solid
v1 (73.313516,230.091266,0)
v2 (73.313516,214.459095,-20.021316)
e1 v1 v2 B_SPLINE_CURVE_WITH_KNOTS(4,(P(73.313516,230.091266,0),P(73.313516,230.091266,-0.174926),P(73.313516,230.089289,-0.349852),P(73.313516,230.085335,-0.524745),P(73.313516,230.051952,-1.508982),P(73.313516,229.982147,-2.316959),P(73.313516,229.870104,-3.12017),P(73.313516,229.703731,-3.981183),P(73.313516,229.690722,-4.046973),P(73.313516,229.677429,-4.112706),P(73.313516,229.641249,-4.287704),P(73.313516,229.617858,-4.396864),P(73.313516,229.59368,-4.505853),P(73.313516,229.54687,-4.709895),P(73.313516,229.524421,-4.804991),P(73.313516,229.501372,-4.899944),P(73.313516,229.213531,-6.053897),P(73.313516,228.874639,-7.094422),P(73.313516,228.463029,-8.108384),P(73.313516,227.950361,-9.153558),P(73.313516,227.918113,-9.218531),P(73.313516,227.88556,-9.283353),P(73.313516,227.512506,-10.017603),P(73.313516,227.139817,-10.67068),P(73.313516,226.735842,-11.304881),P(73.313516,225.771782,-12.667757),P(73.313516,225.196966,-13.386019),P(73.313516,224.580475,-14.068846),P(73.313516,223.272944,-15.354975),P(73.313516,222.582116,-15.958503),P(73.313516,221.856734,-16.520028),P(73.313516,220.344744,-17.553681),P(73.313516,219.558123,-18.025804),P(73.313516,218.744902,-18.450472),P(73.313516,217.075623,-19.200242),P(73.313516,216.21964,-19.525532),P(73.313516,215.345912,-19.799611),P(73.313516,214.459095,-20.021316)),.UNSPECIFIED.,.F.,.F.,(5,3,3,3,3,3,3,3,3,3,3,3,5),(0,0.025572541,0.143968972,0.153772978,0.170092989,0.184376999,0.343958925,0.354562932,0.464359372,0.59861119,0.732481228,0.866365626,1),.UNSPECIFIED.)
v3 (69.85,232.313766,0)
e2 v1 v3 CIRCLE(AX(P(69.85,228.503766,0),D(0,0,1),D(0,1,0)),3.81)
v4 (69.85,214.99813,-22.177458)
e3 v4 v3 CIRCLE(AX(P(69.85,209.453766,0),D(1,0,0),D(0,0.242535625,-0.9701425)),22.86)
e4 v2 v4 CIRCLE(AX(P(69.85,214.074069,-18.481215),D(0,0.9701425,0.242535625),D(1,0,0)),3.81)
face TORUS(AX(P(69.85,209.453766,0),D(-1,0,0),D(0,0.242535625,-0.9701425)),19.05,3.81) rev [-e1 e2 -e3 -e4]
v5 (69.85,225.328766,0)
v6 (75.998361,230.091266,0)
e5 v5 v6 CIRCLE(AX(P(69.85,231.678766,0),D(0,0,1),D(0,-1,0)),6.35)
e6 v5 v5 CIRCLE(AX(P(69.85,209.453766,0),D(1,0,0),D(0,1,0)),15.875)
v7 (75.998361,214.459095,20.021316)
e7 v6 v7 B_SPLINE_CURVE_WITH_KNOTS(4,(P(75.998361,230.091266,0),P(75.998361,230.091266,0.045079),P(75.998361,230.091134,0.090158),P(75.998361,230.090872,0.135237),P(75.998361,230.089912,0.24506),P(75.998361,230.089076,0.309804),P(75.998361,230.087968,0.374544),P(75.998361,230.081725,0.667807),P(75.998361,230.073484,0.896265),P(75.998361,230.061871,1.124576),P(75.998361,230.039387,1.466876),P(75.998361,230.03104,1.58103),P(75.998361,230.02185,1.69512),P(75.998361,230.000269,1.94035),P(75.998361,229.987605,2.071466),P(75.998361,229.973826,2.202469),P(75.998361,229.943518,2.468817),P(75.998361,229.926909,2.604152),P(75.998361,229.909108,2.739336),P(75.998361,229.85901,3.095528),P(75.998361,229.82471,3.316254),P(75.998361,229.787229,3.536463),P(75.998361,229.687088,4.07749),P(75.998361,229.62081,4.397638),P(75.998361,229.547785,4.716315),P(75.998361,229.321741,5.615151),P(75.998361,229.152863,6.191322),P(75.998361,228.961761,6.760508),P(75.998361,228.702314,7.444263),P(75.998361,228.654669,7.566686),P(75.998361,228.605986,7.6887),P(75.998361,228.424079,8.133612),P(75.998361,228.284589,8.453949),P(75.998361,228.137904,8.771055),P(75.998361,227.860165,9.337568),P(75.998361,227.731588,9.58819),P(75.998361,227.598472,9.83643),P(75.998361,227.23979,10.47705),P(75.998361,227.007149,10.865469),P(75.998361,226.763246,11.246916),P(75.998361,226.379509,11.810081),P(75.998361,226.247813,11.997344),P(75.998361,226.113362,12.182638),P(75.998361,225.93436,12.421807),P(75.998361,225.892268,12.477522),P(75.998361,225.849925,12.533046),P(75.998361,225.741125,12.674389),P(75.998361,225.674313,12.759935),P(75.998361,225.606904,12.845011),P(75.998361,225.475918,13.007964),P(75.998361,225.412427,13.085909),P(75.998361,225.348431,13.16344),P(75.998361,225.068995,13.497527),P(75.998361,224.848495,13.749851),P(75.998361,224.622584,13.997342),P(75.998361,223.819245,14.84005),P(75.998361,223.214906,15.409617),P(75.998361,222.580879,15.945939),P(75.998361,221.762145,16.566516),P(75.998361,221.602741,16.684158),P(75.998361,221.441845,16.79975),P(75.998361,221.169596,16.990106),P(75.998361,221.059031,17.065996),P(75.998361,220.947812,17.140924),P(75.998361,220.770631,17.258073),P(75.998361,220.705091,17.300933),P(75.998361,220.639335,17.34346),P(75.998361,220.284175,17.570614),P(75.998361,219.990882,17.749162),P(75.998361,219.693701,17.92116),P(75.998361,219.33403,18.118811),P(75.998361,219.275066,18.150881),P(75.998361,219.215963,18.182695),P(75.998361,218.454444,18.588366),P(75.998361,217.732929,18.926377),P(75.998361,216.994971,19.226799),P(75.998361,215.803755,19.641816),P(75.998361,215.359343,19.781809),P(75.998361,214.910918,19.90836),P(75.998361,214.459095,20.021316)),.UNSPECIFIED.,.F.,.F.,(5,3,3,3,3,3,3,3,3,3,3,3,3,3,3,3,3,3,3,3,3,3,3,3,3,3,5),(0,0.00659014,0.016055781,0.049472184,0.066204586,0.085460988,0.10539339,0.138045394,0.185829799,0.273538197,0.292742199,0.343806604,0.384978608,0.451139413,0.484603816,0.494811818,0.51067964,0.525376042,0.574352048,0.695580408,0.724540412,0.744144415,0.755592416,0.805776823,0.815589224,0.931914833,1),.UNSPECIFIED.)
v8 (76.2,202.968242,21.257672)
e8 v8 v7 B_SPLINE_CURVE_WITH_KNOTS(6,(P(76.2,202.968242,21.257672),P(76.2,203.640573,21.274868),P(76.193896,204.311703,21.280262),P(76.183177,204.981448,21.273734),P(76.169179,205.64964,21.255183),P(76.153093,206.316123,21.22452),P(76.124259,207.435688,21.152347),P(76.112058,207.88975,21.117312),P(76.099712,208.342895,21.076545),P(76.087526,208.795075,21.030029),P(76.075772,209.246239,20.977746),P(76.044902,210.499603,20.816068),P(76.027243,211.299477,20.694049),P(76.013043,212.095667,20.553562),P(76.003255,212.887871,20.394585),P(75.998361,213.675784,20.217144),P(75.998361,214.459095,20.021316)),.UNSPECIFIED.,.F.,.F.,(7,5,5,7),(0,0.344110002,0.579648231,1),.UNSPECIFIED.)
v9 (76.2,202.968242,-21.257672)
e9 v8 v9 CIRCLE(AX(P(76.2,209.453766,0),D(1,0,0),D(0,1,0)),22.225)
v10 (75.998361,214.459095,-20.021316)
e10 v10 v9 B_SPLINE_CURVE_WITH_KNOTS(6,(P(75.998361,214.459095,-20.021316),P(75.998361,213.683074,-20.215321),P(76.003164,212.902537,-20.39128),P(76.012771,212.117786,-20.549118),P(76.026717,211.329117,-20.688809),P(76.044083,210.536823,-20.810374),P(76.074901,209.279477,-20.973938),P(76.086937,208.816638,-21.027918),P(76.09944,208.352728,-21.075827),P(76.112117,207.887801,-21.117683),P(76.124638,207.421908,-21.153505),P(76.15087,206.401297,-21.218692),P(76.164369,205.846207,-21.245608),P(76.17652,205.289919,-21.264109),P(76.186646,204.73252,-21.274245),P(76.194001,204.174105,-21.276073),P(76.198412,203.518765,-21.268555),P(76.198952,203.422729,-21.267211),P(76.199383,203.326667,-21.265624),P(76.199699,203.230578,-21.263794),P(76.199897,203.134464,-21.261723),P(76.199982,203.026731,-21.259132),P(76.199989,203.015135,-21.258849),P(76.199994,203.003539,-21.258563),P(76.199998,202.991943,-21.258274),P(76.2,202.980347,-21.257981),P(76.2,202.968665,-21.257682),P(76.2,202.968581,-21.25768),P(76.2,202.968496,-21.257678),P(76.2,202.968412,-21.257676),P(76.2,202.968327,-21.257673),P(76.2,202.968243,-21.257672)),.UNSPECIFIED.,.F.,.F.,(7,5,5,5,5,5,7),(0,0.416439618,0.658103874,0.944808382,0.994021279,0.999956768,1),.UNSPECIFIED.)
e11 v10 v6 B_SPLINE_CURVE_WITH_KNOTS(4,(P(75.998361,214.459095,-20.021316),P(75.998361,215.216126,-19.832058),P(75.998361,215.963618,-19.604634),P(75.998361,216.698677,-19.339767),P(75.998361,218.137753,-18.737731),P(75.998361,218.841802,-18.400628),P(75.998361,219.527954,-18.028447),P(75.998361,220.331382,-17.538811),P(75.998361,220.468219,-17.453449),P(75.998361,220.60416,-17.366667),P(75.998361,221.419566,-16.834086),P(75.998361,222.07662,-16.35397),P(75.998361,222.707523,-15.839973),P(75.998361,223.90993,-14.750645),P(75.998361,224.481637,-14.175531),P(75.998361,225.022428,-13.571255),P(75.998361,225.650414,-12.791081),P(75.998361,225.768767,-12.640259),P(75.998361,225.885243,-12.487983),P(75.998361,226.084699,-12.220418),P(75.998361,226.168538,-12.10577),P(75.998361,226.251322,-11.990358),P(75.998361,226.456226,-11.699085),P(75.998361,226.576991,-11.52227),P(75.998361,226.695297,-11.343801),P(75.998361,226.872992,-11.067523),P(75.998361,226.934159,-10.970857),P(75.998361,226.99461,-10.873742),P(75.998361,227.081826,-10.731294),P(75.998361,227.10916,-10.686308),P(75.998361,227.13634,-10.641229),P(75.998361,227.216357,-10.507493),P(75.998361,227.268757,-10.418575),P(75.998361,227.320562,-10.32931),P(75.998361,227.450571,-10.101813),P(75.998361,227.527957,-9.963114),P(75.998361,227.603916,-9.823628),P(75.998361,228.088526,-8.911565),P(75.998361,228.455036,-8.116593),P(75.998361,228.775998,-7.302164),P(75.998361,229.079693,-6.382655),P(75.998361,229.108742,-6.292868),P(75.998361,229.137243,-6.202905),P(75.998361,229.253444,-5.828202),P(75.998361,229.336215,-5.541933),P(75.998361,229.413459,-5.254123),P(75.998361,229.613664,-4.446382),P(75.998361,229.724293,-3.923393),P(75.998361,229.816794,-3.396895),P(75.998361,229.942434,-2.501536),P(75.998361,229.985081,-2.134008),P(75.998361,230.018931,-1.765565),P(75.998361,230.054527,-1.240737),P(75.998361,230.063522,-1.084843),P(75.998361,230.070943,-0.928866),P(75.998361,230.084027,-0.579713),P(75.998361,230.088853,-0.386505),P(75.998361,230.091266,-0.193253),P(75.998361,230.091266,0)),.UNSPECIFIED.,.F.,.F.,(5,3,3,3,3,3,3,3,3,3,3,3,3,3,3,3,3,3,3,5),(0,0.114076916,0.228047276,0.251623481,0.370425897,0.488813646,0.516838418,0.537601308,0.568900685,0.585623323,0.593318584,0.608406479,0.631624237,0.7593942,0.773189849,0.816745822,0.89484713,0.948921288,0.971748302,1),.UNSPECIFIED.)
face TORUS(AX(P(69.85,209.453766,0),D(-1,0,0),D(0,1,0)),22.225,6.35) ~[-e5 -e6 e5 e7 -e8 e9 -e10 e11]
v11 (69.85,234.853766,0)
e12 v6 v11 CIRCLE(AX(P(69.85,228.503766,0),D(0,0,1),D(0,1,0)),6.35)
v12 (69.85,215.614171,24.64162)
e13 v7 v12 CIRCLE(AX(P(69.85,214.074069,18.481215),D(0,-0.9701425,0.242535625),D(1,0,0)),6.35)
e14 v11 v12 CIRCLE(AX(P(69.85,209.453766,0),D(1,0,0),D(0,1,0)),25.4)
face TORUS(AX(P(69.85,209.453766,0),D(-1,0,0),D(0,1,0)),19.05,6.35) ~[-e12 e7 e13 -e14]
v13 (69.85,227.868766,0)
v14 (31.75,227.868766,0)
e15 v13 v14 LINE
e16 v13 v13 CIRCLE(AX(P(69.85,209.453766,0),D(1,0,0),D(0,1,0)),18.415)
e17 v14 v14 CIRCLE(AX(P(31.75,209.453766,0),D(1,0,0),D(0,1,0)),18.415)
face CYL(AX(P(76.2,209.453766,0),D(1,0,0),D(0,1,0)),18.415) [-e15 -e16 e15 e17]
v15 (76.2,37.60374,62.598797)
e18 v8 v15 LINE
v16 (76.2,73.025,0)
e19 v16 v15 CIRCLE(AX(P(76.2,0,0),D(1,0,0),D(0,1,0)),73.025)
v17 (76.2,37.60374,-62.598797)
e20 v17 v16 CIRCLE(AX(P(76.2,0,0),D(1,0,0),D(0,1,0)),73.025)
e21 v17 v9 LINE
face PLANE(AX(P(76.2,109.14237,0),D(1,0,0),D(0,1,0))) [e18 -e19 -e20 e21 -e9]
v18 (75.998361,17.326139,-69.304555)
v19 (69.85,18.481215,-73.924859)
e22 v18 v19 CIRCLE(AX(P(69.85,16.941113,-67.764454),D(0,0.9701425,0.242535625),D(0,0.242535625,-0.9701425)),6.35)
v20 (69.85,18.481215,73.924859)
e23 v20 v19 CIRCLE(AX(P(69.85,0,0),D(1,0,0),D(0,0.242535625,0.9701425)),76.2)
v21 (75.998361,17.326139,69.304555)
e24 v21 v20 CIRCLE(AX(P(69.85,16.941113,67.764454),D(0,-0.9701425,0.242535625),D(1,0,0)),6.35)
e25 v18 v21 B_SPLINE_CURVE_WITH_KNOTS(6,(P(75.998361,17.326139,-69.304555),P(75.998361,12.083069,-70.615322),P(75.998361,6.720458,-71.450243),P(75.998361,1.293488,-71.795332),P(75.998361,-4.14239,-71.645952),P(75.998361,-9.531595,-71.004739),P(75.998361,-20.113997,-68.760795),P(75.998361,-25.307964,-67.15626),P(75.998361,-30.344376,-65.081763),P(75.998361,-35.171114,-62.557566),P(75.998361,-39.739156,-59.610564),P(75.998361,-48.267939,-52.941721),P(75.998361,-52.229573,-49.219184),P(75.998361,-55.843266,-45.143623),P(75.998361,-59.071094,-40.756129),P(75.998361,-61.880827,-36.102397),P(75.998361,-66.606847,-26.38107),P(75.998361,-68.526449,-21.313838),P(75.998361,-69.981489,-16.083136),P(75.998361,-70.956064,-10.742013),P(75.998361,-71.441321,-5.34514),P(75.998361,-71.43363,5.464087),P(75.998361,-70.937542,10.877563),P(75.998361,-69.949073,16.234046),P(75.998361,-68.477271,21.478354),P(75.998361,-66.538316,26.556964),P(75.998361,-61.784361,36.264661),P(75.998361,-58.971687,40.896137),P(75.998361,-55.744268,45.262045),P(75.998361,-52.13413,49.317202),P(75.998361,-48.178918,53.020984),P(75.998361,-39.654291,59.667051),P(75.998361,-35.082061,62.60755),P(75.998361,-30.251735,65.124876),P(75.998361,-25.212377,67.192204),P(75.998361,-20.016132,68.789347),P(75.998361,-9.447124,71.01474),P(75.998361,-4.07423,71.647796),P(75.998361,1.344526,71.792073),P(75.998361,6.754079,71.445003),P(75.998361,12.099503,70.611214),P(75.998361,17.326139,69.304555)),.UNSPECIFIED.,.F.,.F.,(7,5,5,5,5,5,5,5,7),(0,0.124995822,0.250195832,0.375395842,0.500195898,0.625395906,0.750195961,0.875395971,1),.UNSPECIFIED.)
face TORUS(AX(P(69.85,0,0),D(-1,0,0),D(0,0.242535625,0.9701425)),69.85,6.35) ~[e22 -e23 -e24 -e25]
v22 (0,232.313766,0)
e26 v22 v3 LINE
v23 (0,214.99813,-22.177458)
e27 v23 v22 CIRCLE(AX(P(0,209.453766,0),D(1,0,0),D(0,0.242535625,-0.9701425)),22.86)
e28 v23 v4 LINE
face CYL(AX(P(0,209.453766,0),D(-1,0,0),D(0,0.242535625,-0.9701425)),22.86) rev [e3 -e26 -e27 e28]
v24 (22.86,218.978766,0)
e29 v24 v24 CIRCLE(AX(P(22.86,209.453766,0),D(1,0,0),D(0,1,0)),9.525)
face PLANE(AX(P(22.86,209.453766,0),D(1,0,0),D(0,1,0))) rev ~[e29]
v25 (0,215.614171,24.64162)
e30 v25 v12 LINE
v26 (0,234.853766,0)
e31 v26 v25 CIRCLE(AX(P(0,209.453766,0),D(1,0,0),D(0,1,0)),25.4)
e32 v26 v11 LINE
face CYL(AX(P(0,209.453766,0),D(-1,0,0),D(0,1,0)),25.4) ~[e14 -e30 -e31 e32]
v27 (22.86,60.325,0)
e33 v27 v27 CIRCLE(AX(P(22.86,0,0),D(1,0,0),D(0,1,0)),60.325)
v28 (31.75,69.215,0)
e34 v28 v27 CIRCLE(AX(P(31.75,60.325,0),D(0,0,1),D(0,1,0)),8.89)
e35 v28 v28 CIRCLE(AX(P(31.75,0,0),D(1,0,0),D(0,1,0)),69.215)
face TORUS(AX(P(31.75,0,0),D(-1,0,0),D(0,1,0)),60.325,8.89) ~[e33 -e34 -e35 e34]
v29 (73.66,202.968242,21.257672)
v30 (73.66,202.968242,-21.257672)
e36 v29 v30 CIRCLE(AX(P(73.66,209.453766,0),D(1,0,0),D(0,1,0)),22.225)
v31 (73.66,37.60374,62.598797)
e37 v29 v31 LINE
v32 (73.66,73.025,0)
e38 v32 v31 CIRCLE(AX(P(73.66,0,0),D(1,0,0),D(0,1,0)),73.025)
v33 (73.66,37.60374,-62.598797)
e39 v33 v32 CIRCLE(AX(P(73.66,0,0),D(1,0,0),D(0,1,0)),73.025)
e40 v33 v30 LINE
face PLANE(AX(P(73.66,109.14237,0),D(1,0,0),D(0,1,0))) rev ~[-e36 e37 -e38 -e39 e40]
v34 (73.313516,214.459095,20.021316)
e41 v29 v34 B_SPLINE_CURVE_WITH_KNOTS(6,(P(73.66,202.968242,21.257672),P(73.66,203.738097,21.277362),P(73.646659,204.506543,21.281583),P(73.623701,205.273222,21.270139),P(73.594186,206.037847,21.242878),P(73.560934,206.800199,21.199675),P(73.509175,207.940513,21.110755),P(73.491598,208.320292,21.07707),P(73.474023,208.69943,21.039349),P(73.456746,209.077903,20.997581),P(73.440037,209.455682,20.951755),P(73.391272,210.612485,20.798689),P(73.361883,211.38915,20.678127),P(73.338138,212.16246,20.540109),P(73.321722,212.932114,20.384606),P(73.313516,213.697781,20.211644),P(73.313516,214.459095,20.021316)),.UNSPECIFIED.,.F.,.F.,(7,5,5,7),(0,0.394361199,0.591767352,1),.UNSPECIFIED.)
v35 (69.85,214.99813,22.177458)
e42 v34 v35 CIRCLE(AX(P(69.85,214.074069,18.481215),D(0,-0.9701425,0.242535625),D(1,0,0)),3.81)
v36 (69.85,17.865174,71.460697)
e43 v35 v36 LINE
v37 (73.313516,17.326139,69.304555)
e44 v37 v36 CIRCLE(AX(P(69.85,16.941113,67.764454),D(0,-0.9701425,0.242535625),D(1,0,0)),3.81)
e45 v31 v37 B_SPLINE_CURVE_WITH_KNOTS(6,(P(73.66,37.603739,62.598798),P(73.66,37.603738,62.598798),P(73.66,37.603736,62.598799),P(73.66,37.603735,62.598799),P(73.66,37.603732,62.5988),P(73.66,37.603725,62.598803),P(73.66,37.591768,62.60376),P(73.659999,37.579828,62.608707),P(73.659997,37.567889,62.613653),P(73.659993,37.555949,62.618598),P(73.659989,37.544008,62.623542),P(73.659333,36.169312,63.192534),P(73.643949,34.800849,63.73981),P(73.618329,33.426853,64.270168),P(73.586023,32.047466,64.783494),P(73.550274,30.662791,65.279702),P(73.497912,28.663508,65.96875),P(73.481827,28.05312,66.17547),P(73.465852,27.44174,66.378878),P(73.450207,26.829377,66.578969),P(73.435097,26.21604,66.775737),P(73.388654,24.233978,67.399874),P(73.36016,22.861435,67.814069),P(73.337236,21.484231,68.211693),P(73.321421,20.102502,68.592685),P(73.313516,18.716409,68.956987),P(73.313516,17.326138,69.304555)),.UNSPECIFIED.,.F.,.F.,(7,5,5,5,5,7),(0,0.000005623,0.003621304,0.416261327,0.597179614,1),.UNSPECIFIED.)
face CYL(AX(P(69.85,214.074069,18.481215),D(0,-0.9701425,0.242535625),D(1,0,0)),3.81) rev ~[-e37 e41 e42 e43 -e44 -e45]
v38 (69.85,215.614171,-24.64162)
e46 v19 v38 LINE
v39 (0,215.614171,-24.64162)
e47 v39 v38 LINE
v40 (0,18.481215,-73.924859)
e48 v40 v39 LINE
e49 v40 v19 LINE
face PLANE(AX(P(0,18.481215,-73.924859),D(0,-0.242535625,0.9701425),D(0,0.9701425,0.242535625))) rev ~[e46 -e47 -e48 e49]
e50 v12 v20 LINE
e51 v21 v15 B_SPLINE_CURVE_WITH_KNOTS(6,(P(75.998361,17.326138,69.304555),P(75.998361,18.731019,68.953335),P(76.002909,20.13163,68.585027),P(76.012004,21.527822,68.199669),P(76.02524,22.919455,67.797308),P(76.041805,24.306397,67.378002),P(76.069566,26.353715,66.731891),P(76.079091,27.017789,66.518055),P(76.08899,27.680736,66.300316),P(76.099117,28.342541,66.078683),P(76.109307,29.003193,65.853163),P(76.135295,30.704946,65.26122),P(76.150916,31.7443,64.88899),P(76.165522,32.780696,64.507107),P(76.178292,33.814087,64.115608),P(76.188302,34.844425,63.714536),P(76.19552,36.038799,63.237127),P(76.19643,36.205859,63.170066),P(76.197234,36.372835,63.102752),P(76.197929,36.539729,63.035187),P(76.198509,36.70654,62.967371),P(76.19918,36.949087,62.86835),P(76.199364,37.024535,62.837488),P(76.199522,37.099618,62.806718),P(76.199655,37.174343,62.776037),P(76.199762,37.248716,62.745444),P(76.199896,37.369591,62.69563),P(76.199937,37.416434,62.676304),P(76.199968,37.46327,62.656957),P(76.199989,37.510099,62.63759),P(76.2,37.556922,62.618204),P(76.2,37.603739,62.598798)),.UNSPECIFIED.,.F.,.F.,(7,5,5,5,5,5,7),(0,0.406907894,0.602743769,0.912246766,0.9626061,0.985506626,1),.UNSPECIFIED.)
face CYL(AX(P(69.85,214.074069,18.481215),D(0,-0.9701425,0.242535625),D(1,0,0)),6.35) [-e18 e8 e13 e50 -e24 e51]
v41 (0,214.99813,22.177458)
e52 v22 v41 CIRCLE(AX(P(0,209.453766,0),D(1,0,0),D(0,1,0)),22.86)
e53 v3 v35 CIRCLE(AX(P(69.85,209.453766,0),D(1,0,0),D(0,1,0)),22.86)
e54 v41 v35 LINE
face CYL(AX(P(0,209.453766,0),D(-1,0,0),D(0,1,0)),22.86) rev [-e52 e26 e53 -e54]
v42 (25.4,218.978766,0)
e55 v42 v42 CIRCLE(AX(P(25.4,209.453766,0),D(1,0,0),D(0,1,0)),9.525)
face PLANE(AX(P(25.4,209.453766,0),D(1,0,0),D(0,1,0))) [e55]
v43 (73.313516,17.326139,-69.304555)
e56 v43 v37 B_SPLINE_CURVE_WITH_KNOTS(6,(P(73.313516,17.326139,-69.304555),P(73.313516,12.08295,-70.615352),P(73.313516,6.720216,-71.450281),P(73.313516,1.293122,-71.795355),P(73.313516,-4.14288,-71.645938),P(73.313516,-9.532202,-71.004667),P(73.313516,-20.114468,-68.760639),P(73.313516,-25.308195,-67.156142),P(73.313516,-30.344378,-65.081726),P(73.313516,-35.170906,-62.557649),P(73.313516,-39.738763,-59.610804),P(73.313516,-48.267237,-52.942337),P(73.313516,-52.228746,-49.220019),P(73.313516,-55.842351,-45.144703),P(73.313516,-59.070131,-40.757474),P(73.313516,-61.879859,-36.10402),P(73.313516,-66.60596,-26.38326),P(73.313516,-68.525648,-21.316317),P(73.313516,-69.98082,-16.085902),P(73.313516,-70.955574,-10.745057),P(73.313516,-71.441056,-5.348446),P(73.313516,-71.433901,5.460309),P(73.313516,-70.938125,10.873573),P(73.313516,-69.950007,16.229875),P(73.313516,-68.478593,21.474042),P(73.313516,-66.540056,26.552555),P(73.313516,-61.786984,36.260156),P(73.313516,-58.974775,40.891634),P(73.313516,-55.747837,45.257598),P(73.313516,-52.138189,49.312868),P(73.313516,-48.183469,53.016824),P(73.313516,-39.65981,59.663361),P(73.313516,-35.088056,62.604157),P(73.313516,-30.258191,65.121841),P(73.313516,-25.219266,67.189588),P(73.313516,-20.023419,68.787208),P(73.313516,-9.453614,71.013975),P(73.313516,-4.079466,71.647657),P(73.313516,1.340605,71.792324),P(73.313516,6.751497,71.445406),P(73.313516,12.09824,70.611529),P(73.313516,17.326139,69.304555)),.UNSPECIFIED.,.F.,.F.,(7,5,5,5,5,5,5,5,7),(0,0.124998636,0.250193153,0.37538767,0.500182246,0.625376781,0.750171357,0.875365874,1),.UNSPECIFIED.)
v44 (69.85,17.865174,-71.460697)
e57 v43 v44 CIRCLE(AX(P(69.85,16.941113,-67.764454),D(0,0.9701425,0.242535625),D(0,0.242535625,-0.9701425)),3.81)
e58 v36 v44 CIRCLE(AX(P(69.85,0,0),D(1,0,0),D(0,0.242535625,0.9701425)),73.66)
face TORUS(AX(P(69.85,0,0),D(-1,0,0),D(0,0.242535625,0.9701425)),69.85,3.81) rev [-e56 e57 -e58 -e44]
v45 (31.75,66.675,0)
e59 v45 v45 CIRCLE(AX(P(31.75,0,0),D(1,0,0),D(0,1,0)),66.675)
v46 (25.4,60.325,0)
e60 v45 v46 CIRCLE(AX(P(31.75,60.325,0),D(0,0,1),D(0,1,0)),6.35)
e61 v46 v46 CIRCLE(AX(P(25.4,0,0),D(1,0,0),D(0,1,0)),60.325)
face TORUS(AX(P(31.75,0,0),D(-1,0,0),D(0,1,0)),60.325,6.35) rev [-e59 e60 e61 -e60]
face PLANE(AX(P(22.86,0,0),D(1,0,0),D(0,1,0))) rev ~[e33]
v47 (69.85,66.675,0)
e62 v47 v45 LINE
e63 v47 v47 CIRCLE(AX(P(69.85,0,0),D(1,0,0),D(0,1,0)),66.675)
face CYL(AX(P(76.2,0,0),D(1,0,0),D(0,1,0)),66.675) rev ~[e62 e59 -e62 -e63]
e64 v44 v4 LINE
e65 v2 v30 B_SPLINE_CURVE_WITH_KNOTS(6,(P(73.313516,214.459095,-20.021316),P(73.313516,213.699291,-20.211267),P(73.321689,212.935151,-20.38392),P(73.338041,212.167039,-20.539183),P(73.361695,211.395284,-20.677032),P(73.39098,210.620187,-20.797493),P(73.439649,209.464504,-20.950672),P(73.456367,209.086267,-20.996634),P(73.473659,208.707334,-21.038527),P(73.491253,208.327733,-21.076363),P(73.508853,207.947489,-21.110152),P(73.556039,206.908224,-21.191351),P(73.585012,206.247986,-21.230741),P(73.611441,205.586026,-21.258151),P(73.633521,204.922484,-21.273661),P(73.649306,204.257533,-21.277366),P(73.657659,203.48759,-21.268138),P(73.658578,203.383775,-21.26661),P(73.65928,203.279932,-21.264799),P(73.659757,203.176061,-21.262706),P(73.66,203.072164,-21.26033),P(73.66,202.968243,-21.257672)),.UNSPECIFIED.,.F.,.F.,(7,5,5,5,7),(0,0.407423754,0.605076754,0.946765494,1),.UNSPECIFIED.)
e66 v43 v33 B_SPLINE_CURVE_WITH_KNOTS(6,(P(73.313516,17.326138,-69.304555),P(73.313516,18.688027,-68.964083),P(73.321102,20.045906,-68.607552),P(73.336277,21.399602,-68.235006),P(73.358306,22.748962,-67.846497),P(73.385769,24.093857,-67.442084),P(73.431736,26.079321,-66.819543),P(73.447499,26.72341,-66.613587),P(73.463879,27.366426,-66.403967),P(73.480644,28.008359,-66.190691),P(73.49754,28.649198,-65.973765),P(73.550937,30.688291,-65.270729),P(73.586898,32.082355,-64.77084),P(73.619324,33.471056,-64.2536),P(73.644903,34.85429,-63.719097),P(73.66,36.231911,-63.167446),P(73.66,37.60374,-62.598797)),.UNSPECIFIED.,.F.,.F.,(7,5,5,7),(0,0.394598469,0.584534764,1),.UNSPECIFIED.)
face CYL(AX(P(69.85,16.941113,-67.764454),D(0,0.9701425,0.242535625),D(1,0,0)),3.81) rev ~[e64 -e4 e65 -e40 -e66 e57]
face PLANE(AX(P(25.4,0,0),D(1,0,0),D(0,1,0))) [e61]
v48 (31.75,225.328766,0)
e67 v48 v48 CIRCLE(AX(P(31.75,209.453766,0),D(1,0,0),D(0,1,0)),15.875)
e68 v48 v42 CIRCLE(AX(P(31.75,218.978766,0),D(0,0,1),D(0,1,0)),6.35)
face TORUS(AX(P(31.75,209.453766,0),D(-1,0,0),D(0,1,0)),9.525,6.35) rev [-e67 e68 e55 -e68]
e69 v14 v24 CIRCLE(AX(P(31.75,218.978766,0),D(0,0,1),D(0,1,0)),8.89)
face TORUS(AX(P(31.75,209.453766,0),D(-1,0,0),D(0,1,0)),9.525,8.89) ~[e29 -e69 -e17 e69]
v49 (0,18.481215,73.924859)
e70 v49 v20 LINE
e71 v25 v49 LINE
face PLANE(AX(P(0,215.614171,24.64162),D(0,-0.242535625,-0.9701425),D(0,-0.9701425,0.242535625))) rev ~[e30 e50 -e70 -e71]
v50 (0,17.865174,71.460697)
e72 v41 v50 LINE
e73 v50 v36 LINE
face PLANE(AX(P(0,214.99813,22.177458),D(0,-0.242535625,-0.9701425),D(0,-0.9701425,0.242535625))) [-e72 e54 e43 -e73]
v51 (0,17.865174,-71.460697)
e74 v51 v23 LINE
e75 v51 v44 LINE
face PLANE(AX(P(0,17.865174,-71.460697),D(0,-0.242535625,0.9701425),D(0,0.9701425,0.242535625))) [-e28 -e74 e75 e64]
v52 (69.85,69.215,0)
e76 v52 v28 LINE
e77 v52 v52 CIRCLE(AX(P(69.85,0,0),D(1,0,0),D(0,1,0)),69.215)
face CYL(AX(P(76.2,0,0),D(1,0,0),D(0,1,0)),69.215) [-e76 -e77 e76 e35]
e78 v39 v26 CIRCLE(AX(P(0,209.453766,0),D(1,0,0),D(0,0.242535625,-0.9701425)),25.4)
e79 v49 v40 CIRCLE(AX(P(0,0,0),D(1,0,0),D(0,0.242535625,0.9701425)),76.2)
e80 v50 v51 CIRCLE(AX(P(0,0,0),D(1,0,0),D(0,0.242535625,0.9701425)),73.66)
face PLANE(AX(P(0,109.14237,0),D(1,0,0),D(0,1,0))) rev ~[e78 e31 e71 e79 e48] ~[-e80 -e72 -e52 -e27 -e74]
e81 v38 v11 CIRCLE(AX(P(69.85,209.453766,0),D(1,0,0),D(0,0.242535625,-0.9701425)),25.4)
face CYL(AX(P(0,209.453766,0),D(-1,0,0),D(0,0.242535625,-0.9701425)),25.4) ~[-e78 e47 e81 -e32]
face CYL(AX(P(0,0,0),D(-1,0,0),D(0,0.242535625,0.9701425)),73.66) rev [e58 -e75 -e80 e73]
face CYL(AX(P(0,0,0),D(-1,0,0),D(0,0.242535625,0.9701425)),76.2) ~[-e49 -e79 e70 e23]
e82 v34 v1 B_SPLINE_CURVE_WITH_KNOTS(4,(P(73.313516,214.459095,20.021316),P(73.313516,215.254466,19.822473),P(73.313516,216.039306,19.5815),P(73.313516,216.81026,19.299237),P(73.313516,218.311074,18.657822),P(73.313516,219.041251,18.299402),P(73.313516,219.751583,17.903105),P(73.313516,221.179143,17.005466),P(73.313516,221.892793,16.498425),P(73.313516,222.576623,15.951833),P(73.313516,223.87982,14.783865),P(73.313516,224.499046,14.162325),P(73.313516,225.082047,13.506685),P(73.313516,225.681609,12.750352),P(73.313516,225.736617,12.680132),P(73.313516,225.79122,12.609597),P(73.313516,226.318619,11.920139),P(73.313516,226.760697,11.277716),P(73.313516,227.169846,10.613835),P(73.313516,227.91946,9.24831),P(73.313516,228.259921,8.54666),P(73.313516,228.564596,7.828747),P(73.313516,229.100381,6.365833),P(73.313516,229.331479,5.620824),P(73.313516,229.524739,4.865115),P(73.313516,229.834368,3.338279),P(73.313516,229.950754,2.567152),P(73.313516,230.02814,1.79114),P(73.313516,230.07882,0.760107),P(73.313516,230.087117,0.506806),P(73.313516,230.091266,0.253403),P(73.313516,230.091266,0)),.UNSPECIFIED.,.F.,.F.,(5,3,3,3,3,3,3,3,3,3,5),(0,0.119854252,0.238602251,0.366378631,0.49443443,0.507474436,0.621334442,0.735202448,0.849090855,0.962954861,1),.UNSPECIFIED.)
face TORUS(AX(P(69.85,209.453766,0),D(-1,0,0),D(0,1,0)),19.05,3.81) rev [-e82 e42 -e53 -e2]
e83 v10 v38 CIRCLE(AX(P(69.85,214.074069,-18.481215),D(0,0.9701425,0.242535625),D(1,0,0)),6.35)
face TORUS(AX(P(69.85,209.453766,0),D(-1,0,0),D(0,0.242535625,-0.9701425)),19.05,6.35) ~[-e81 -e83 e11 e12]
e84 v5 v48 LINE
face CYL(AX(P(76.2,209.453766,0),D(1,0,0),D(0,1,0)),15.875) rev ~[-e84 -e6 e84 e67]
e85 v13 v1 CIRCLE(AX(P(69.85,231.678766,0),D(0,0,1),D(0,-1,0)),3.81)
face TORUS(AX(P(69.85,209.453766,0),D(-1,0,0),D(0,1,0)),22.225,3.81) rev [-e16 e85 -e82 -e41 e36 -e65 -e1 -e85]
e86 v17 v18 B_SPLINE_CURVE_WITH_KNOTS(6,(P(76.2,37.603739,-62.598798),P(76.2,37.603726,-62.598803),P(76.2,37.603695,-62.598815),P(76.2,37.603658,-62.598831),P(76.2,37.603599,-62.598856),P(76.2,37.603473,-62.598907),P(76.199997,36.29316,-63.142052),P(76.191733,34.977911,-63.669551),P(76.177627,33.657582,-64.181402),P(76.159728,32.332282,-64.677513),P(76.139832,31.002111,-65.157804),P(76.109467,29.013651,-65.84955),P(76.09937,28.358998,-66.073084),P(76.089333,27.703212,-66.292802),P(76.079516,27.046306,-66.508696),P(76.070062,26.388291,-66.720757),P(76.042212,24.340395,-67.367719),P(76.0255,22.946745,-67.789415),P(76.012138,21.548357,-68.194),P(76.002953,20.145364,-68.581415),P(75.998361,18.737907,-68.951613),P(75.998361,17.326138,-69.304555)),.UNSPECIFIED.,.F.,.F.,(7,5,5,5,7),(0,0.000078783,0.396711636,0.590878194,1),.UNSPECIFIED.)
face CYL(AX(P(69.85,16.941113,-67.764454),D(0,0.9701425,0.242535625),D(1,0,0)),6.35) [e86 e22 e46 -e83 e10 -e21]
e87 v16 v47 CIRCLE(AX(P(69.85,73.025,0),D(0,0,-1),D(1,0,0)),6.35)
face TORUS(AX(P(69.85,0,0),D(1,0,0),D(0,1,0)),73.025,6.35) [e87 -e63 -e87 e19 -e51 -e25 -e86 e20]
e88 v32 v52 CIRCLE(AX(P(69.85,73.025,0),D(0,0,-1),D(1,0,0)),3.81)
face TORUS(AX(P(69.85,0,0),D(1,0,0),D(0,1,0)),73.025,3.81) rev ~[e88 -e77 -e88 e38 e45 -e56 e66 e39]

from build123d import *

# Parameters (mm, degrees)
F1_DEPTH = 76.2
F2_R     = 66.675
F2_R_2   = 15.875
F3_DEPTH = 50.8
F4_F1_R  = 6.35
F4_F2_R  = 6.35
F4_F3_R  = 6.35
F5_T     = -2.54


# Not quite as in the source:
# - a fillet or chamfer that OpenCascade refuses, or shapes differently, is made with other operations: its cross-section is extruded or revolved along the edge and cut away or added


with BuildPart() as f1:
    # F0 (on Right) → F1 (new body)
    with BuildSketch(Plane.YZ):
        with BuildLine():
            ThreePointArc((18.4812146278, 73.9248585111), (60.0612543768, 46.8944103565), (76.2, 0))
            ThreePointArc((76.2, 0), (60.0612543768, -46.8944103565), (18.4812146278, -73.9248585111))
            Line((18.4812146278, -73.9248585111), (215.6141706573, -24.6416195037))
            ThreePointArc((215.6141706573, -24.6416195037), (184.0537657814, 0), (215.6141706573, 24.6416195037))
            Line((215.6141706573, 24.6416195037), (18.4812146278, 73.9248585111))
        make_face()
        with BuildLine():
            ThreePointArc((18.4812146278, -73.9248585111), (60.0612543768, -46.8944103565), (76.2, 0))
            ThreePointArc((76.2, 0), (60.0612543768, 46.8944103565), (18.4812146278, 73.9248585111))
            ThreePointArc((18.4812146278, 73.9248585111), (-76.2, 0), (18.4812146278, -73.9248585111))
        make_face()
        with BuildLine():
            ThreePointArc((234.8537657814, 0), (229.474183907, 15.6314701188), (215.6141706573, 24.6416195037))
            ThreePointArc((215.6141706573, 24.6416195037), (184.0537657814, 0), (215.6141706573, -24.6416195037))
            ThreePointArc((215.6141706573, -24.6416195037), (229.474183907, -15.6314701188), (234.8537657814, 0))
        make_face()
    extrude(amount=F1_DEPTH)

    # F2 (on face) → F3 (cut)
    with BuildSketch(Plane.YZ.offset(76.2)):
        Circle(F2_R)
        with Locations((209.4537657814, 0)):
            Circle(F2_R_2)
    extrude(amount=-F3_DEPTH, mode=Mode.SUBTRACT)

    # F4: fillet of radius 6.35 on 10 edges, made by hand

    # F4_f1
    f4_f1_edges = [f1.edges().sort_by_distance(p)[0] for p in [
        (76.2, 117.0476926425, 49.2832390074),
        (76.2, 234.8537657814, 0),
        (76.2, -76.2, 0),
        (76.2, 117.0476926425, -49.2832390074),
    ]]
    fillet(f4_f1_edges, radius=F4_F1_R)

    # F4_f2
    f4_f2_edges = [f1.edges().sort_by_distance(p)[0] for p in [
        (25.4, -66.675, 0),
    ]]
    fillet(f4_f2_edges, radius=F4_F2_R)

    # F4_f3
    f4_f3_edges = [f1.edges().sort_by_distance(p)[0] for p in [
        (25.4, 193.5787657814, 0),
    ]]
    fillet(f4_f3_edges, radius=F4_F3_R)

    # F4_s4 → F4_t5 (revolve, cut)
    with BuildSketch(Plane.XY):
        with BuildLine():
            ThreePointArc((76.2, 73.025), (74.3401280605, 68.5348719395), (69.85, 66.675))
            Line((69.85, 66.675), (69.85, 66.548))
            Line((69.85, 66.548), (76.327, 66.548))
            Line((76.327, 66.548), (76.327, 73.025))
            Line((76.327, 73.025), (76.2, 73.025))
        make_face()
    revolve(axis=Axis((76.2, 0, 0), (1, 0, 0)), mode=Mode.SUBTRACT)

    # F4_s6 → F4_t7 (revolve, cut)
    with BuildSketch(Plane.XY):
        with BuildLine():
            ThreePointArc((69.85, 225.3287657814), (74.3401280605, 227.1886377208), (76.2, 231.6787657814))
            Line((76.2, 231.6787657814), (76.327, 231.6787657814))
            Line((76.327, 231.6787657814), (76.327, 225.2017657814))
            Line((76.327, 225.2017657814), (69.85, 225.2017657814))
            Line((69.85, 225.2017657814), (69.85, 225.3287657814))
        make_face()
    revolve(axis=Axis((76.2, 209.4537657814, 0), (1, 0, 0)), mode=Mode.SUBTRACT)

    # F5
    f5_openings = [f1.faces().sort_by_distance(p)[0] for p in [
        (0, 57.51924, 0),
    ]]
    offset(amount=F5_T, openings=f5_openings)


solid = f1.part
